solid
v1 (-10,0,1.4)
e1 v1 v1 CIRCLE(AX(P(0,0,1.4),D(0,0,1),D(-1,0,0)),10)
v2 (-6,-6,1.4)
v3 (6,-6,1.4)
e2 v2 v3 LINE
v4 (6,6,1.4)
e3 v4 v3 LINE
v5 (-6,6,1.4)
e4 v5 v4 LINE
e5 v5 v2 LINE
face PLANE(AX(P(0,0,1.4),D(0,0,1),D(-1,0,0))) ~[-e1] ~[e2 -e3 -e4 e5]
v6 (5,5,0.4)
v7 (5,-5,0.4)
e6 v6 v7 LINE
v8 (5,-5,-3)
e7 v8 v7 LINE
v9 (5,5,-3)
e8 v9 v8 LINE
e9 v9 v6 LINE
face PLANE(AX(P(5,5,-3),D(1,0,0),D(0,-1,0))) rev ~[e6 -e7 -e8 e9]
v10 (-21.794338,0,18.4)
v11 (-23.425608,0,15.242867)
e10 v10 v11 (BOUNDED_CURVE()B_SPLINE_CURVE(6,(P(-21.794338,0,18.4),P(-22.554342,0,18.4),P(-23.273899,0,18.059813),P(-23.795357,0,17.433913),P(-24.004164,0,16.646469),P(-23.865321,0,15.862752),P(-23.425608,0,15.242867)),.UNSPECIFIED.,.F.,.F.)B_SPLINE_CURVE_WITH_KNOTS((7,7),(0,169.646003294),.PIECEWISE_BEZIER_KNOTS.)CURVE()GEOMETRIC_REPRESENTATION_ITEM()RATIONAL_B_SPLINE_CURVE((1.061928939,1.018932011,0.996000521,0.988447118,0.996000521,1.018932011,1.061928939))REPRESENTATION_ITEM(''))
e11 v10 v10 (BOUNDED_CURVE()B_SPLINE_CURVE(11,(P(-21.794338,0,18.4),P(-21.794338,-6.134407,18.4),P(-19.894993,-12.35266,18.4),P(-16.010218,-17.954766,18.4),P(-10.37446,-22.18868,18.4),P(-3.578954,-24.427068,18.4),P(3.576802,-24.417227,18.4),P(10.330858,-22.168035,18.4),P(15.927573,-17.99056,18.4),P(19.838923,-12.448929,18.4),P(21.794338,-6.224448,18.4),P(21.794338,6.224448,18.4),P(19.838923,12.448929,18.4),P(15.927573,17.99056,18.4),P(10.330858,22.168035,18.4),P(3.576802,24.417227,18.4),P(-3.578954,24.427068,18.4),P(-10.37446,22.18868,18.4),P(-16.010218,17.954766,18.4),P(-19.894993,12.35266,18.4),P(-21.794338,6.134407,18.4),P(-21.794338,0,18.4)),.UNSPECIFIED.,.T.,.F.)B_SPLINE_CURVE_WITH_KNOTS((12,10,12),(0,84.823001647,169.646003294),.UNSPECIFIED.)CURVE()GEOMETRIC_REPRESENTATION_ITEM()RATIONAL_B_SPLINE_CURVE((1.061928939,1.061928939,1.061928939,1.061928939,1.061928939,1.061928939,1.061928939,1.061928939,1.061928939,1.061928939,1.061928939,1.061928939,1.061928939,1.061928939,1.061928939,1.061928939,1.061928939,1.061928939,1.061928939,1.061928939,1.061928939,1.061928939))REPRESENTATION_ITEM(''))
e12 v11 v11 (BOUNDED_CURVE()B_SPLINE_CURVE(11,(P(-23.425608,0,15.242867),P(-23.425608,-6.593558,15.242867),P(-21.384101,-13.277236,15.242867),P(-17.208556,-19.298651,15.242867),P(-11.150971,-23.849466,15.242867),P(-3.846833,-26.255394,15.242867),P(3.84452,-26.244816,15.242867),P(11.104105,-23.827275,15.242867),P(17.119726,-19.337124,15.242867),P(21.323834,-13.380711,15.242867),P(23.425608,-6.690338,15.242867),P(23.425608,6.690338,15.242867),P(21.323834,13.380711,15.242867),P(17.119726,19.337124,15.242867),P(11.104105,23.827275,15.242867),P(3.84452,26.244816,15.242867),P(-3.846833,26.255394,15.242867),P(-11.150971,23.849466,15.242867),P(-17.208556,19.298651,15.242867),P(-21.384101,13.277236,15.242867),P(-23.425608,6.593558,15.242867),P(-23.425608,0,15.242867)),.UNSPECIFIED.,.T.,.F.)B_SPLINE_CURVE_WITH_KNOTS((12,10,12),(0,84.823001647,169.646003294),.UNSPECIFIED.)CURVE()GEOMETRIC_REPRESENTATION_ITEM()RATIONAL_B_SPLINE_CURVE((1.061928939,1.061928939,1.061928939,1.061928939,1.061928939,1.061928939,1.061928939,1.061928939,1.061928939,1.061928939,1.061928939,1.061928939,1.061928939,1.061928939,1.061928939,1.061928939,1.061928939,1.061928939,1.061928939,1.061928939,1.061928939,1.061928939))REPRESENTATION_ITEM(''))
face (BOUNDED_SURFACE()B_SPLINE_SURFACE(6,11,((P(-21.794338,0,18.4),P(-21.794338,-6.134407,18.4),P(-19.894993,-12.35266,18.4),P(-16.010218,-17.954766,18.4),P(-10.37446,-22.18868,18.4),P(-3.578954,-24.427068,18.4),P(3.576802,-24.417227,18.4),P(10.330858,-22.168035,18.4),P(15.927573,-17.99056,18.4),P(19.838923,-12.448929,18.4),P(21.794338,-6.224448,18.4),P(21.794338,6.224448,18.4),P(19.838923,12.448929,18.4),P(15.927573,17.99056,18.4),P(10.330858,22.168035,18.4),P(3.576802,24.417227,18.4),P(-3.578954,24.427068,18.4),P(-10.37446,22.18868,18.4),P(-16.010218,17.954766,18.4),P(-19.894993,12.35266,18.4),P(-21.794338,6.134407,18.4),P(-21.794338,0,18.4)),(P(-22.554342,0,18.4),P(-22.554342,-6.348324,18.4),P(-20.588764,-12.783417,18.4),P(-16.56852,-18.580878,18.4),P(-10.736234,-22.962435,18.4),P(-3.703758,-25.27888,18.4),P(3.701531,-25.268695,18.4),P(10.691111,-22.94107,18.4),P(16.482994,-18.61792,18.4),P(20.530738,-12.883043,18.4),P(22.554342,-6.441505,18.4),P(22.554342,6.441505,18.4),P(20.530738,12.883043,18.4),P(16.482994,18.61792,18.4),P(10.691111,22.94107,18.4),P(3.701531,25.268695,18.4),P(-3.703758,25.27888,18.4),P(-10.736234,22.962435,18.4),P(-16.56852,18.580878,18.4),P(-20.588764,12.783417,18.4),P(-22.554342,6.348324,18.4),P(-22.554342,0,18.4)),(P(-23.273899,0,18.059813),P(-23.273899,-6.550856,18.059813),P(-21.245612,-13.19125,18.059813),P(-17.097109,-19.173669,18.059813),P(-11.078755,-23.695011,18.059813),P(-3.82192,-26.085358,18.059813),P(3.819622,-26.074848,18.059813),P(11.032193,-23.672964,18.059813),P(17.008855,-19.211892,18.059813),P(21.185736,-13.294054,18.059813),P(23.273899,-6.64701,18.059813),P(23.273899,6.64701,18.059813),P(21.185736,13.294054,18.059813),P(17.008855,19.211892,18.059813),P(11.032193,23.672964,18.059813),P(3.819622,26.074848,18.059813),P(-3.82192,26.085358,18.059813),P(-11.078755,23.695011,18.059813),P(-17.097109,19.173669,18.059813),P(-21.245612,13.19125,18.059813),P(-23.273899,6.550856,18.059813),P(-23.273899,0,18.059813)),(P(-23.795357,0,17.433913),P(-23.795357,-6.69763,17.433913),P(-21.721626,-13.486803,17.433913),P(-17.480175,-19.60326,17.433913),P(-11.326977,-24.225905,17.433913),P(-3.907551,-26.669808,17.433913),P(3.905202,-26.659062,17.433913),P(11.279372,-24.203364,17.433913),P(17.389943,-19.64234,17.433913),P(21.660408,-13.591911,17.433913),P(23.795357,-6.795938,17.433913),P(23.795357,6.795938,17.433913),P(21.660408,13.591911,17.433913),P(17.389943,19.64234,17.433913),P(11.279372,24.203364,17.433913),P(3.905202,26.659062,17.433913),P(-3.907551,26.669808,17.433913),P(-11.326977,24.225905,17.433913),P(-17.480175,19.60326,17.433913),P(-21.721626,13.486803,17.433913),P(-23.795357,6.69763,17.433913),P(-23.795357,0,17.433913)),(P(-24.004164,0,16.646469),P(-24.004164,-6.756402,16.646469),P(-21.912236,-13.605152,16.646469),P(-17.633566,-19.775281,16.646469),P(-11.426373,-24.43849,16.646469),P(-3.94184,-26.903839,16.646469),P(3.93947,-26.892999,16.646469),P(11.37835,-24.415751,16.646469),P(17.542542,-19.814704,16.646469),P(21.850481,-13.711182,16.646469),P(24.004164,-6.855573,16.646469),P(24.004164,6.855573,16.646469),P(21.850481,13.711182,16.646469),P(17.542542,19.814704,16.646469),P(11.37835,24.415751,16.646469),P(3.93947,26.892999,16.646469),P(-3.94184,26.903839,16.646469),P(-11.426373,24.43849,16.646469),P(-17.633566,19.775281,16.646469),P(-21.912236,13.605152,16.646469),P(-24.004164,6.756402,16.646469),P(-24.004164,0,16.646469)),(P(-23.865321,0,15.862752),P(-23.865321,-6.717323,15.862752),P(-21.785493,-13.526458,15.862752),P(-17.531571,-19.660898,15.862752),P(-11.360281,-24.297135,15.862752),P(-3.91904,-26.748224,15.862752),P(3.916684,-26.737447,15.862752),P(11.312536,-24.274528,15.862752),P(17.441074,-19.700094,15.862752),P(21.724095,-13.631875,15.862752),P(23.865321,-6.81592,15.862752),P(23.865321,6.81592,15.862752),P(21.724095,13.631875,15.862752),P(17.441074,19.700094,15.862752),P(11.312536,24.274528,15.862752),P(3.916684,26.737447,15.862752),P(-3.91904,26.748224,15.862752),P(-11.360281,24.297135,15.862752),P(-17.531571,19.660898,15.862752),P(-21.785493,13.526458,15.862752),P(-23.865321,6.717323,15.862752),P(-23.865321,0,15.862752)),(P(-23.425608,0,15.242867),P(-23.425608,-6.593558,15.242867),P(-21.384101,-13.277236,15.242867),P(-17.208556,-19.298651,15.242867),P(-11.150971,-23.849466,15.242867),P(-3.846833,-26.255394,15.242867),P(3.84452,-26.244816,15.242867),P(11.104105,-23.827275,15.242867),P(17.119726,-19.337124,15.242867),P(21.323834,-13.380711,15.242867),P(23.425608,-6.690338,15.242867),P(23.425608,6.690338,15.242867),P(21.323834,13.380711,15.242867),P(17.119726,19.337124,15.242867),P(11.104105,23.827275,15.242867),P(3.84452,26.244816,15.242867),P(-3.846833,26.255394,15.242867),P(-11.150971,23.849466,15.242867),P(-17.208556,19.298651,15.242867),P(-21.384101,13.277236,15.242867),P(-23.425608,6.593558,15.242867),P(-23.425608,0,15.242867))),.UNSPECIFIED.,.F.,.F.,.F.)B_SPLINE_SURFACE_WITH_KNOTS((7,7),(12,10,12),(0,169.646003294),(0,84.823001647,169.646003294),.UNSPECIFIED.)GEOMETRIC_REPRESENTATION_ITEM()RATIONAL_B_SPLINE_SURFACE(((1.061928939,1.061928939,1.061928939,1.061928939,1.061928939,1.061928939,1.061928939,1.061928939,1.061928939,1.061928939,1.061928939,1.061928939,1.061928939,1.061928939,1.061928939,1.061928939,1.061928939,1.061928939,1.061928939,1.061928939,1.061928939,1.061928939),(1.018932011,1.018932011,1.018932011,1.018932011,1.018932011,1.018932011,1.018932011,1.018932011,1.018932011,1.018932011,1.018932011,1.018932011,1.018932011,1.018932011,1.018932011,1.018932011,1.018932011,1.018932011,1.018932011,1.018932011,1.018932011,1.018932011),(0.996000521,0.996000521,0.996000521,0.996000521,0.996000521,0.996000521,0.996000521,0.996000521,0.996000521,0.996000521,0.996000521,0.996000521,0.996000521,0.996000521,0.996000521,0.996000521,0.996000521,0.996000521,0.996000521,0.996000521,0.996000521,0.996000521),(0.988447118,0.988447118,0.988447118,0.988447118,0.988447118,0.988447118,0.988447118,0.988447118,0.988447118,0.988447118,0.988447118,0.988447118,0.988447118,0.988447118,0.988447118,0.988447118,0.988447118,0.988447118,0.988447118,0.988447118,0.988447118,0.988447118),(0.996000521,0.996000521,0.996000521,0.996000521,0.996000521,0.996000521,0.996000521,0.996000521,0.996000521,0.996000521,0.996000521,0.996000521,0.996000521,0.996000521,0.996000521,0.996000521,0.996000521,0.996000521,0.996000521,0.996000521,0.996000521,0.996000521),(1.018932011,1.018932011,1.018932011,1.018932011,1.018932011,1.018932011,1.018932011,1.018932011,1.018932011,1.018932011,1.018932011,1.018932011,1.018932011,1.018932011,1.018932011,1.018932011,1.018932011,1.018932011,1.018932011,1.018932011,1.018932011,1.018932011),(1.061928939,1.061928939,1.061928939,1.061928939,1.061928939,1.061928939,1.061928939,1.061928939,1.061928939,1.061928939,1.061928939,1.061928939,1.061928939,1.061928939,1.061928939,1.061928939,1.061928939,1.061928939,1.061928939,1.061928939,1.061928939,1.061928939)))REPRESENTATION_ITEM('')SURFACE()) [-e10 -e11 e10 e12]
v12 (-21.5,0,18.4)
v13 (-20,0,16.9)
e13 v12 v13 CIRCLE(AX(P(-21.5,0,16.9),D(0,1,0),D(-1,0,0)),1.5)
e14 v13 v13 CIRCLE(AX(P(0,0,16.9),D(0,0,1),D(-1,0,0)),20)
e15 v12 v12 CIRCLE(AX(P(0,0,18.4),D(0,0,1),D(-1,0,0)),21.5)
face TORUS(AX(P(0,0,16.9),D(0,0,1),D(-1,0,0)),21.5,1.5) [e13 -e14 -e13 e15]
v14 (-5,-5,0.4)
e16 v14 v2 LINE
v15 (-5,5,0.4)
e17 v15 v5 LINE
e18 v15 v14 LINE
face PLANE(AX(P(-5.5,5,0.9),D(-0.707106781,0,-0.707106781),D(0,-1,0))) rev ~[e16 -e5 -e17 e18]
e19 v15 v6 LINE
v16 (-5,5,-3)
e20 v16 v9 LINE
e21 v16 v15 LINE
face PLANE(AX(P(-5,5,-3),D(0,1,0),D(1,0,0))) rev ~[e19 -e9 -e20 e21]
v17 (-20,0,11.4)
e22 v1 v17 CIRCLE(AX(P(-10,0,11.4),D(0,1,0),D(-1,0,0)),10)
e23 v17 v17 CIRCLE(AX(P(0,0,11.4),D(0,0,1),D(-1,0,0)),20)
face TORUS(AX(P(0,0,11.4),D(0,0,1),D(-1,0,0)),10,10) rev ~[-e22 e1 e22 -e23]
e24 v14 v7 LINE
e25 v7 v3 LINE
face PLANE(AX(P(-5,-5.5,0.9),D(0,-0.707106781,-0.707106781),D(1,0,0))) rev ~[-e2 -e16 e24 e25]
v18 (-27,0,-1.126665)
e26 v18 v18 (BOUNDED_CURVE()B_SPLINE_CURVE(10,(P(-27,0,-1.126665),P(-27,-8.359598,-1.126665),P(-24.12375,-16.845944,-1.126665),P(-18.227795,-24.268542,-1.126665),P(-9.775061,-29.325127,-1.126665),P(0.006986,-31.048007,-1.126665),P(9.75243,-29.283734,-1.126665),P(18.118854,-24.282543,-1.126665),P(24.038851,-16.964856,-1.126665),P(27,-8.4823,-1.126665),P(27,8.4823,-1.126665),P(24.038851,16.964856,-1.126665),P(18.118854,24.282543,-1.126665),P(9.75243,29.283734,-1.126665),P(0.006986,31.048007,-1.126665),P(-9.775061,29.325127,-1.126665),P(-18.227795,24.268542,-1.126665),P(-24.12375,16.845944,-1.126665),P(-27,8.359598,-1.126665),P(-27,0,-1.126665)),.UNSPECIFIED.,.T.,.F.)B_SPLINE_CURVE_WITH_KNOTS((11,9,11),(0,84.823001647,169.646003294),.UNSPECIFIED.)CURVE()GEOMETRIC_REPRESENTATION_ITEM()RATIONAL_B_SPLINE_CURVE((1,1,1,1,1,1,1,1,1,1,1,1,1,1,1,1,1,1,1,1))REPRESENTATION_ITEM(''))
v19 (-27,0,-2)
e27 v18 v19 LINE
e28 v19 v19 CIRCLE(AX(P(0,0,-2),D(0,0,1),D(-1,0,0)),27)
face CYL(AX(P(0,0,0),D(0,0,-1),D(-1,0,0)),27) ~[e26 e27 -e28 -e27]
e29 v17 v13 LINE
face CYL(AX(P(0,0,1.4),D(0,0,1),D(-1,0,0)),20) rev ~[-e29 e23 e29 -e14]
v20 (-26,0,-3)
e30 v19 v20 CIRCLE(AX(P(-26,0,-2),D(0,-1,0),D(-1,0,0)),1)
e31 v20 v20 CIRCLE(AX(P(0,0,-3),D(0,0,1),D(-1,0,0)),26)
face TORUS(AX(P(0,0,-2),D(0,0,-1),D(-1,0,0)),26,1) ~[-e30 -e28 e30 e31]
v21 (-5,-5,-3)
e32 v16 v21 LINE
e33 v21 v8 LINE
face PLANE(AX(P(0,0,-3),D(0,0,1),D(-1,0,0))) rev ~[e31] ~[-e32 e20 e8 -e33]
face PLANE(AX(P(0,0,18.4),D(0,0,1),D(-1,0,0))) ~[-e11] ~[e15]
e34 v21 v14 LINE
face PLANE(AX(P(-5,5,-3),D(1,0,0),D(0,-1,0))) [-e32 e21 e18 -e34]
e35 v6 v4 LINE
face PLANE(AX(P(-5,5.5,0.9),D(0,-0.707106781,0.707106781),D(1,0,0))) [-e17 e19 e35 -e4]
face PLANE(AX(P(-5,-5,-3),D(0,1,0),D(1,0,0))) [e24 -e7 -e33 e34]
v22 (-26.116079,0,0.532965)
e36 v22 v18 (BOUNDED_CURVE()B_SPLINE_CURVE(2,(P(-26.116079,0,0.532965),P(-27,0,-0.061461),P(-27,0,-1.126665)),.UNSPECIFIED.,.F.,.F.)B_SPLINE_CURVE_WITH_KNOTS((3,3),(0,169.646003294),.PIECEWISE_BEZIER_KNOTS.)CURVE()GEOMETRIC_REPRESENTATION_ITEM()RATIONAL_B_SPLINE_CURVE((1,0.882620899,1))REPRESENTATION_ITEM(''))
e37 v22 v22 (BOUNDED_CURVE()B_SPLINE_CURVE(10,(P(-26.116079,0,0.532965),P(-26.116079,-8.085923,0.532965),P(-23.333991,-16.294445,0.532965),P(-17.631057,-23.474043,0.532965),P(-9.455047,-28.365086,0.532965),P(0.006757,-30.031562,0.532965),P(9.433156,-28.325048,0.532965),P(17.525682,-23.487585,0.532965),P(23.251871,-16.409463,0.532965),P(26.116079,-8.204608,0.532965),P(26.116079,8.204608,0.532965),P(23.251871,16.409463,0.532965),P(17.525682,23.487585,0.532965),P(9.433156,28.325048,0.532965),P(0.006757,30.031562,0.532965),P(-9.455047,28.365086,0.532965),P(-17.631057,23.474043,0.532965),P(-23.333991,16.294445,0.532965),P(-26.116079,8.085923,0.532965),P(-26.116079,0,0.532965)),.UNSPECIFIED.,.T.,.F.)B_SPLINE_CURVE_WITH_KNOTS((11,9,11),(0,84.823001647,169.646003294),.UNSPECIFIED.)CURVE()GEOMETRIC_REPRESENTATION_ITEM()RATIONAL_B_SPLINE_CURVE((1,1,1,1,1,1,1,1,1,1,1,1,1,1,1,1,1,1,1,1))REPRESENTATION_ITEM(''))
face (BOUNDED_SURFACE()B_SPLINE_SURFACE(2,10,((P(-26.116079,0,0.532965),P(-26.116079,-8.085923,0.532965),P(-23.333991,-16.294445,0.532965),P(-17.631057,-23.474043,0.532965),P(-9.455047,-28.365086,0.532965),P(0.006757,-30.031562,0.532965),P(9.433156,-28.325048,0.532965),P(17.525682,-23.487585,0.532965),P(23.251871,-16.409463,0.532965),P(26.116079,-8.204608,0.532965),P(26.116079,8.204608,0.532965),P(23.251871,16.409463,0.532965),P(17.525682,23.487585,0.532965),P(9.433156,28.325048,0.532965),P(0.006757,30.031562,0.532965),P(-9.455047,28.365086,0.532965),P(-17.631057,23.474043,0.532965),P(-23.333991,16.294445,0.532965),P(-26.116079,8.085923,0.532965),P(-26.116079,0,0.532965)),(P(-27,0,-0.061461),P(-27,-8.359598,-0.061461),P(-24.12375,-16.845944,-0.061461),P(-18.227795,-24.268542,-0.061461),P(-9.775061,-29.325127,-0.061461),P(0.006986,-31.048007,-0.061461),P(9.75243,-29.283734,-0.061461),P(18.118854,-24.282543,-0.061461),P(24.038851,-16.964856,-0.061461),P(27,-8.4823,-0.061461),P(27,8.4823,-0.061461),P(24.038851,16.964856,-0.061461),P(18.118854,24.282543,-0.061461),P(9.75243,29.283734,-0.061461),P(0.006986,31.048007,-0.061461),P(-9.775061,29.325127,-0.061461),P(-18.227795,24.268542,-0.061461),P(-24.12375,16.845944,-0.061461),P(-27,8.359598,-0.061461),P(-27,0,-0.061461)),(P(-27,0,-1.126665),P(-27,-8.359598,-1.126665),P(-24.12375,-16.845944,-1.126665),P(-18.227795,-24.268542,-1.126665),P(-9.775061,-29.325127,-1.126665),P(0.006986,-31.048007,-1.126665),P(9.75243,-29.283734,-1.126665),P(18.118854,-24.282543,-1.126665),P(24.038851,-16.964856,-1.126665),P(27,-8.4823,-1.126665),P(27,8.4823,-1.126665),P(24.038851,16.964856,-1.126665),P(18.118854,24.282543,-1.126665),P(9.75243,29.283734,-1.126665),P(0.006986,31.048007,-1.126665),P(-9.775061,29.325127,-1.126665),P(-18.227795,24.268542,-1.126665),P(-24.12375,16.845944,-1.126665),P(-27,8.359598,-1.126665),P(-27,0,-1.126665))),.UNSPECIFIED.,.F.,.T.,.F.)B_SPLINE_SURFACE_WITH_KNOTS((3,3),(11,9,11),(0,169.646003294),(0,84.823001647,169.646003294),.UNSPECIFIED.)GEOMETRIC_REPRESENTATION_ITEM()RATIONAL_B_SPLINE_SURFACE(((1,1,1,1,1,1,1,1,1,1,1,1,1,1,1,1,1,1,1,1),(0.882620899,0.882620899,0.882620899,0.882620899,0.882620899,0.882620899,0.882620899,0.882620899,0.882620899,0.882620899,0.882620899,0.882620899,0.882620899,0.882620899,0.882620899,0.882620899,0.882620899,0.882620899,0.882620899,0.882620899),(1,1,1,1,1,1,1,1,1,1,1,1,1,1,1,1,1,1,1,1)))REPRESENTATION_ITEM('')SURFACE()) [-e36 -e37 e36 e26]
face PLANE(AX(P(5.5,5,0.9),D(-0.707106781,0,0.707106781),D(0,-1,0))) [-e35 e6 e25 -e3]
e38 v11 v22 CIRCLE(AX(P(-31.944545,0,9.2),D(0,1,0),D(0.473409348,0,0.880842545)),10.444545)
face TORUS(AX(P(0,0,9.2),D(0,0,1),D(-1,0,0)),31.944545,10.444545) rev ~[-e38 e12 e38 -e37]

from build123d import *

# Parameters (mm, degrees)
F2_R     = 10
F3_R     = 2
F4_R     = 1.5
F5_W     = 10
F5_H     = 10
F6_DEPTH = 21.4010001
F7_R     = 1
F8_SIZE  = 1


with BuildPart() as f1:
    # F0 (on Front) → F1 (revolve)
    with BuildSketch(Plane.XZ):
        with BuildLine():
            ThreePointArc((-27, 18.4), (-21.5, 9.2), (-27, 0))
            Line((-27, 0), (-27, -3))
            Line((-27, -3), (0, -3))
            Line((0, -3), (0, 0))
            Line((0, 0), (0, 1.4))
            Line((0, 1.4), (-20, 1.4))
            Line((-20, 1.4), (-20, 18.4))
            Line((-20, 18.4), (-27, 18.4))
        make_face()
    revolve(axis=Axis((0, 0, 0.7), (0, 0, 1)))

    # F2
    f2_edges = [f1.edges().sort_by_distance(p)[0] for p in [
        (20, 0, 1.4),
    ]]
    fillet(f2_edges, radius=F2_R)

    # F3
    f3_edges = [f1.edges().sort_by_distance(p)[0] for p in [
        (27, 0, 18.4),
        (27, 0, 0),
    ]]
    fillet(f3_edges, radius=F3_R)

    # F4
    f4_edges = [f1.edges().sort_by_distance(p)[0] for p in [
        (20, 0, 18.4),
    ]]
    fillet(f4_edges, radius=F4_R)

    # F5 (on face) → F6 (cut, through all)
    with BuildSketch(Plane(origin=(0, 0, -3), x_dir=(1, 0, 0), z_dir=(0, 0, -1))):
        Rectangle(F5_W, F5_H)
    extrude(amount=-F6_DEPTH, mode=Mode.SUBTRACT)

    # F7
    f7_edges = [f1.edges().sort_by_distance(p)[0] for p in [
        (27, 0, -3),
    ]]
    fillet(f7_edges, radius=F7_R)

    # F8
    f8_edges = [f1.edges().sort_by_distance(p)[0] for p in [
        (5, 0, 1.4),
        (0, 5, 1.4),
        (-5, 0, 1.4),
        (0, -5, 1.4),
    ]]
    chamfer(f8_edges, length=F8_SIZE)


solid = f1.part
